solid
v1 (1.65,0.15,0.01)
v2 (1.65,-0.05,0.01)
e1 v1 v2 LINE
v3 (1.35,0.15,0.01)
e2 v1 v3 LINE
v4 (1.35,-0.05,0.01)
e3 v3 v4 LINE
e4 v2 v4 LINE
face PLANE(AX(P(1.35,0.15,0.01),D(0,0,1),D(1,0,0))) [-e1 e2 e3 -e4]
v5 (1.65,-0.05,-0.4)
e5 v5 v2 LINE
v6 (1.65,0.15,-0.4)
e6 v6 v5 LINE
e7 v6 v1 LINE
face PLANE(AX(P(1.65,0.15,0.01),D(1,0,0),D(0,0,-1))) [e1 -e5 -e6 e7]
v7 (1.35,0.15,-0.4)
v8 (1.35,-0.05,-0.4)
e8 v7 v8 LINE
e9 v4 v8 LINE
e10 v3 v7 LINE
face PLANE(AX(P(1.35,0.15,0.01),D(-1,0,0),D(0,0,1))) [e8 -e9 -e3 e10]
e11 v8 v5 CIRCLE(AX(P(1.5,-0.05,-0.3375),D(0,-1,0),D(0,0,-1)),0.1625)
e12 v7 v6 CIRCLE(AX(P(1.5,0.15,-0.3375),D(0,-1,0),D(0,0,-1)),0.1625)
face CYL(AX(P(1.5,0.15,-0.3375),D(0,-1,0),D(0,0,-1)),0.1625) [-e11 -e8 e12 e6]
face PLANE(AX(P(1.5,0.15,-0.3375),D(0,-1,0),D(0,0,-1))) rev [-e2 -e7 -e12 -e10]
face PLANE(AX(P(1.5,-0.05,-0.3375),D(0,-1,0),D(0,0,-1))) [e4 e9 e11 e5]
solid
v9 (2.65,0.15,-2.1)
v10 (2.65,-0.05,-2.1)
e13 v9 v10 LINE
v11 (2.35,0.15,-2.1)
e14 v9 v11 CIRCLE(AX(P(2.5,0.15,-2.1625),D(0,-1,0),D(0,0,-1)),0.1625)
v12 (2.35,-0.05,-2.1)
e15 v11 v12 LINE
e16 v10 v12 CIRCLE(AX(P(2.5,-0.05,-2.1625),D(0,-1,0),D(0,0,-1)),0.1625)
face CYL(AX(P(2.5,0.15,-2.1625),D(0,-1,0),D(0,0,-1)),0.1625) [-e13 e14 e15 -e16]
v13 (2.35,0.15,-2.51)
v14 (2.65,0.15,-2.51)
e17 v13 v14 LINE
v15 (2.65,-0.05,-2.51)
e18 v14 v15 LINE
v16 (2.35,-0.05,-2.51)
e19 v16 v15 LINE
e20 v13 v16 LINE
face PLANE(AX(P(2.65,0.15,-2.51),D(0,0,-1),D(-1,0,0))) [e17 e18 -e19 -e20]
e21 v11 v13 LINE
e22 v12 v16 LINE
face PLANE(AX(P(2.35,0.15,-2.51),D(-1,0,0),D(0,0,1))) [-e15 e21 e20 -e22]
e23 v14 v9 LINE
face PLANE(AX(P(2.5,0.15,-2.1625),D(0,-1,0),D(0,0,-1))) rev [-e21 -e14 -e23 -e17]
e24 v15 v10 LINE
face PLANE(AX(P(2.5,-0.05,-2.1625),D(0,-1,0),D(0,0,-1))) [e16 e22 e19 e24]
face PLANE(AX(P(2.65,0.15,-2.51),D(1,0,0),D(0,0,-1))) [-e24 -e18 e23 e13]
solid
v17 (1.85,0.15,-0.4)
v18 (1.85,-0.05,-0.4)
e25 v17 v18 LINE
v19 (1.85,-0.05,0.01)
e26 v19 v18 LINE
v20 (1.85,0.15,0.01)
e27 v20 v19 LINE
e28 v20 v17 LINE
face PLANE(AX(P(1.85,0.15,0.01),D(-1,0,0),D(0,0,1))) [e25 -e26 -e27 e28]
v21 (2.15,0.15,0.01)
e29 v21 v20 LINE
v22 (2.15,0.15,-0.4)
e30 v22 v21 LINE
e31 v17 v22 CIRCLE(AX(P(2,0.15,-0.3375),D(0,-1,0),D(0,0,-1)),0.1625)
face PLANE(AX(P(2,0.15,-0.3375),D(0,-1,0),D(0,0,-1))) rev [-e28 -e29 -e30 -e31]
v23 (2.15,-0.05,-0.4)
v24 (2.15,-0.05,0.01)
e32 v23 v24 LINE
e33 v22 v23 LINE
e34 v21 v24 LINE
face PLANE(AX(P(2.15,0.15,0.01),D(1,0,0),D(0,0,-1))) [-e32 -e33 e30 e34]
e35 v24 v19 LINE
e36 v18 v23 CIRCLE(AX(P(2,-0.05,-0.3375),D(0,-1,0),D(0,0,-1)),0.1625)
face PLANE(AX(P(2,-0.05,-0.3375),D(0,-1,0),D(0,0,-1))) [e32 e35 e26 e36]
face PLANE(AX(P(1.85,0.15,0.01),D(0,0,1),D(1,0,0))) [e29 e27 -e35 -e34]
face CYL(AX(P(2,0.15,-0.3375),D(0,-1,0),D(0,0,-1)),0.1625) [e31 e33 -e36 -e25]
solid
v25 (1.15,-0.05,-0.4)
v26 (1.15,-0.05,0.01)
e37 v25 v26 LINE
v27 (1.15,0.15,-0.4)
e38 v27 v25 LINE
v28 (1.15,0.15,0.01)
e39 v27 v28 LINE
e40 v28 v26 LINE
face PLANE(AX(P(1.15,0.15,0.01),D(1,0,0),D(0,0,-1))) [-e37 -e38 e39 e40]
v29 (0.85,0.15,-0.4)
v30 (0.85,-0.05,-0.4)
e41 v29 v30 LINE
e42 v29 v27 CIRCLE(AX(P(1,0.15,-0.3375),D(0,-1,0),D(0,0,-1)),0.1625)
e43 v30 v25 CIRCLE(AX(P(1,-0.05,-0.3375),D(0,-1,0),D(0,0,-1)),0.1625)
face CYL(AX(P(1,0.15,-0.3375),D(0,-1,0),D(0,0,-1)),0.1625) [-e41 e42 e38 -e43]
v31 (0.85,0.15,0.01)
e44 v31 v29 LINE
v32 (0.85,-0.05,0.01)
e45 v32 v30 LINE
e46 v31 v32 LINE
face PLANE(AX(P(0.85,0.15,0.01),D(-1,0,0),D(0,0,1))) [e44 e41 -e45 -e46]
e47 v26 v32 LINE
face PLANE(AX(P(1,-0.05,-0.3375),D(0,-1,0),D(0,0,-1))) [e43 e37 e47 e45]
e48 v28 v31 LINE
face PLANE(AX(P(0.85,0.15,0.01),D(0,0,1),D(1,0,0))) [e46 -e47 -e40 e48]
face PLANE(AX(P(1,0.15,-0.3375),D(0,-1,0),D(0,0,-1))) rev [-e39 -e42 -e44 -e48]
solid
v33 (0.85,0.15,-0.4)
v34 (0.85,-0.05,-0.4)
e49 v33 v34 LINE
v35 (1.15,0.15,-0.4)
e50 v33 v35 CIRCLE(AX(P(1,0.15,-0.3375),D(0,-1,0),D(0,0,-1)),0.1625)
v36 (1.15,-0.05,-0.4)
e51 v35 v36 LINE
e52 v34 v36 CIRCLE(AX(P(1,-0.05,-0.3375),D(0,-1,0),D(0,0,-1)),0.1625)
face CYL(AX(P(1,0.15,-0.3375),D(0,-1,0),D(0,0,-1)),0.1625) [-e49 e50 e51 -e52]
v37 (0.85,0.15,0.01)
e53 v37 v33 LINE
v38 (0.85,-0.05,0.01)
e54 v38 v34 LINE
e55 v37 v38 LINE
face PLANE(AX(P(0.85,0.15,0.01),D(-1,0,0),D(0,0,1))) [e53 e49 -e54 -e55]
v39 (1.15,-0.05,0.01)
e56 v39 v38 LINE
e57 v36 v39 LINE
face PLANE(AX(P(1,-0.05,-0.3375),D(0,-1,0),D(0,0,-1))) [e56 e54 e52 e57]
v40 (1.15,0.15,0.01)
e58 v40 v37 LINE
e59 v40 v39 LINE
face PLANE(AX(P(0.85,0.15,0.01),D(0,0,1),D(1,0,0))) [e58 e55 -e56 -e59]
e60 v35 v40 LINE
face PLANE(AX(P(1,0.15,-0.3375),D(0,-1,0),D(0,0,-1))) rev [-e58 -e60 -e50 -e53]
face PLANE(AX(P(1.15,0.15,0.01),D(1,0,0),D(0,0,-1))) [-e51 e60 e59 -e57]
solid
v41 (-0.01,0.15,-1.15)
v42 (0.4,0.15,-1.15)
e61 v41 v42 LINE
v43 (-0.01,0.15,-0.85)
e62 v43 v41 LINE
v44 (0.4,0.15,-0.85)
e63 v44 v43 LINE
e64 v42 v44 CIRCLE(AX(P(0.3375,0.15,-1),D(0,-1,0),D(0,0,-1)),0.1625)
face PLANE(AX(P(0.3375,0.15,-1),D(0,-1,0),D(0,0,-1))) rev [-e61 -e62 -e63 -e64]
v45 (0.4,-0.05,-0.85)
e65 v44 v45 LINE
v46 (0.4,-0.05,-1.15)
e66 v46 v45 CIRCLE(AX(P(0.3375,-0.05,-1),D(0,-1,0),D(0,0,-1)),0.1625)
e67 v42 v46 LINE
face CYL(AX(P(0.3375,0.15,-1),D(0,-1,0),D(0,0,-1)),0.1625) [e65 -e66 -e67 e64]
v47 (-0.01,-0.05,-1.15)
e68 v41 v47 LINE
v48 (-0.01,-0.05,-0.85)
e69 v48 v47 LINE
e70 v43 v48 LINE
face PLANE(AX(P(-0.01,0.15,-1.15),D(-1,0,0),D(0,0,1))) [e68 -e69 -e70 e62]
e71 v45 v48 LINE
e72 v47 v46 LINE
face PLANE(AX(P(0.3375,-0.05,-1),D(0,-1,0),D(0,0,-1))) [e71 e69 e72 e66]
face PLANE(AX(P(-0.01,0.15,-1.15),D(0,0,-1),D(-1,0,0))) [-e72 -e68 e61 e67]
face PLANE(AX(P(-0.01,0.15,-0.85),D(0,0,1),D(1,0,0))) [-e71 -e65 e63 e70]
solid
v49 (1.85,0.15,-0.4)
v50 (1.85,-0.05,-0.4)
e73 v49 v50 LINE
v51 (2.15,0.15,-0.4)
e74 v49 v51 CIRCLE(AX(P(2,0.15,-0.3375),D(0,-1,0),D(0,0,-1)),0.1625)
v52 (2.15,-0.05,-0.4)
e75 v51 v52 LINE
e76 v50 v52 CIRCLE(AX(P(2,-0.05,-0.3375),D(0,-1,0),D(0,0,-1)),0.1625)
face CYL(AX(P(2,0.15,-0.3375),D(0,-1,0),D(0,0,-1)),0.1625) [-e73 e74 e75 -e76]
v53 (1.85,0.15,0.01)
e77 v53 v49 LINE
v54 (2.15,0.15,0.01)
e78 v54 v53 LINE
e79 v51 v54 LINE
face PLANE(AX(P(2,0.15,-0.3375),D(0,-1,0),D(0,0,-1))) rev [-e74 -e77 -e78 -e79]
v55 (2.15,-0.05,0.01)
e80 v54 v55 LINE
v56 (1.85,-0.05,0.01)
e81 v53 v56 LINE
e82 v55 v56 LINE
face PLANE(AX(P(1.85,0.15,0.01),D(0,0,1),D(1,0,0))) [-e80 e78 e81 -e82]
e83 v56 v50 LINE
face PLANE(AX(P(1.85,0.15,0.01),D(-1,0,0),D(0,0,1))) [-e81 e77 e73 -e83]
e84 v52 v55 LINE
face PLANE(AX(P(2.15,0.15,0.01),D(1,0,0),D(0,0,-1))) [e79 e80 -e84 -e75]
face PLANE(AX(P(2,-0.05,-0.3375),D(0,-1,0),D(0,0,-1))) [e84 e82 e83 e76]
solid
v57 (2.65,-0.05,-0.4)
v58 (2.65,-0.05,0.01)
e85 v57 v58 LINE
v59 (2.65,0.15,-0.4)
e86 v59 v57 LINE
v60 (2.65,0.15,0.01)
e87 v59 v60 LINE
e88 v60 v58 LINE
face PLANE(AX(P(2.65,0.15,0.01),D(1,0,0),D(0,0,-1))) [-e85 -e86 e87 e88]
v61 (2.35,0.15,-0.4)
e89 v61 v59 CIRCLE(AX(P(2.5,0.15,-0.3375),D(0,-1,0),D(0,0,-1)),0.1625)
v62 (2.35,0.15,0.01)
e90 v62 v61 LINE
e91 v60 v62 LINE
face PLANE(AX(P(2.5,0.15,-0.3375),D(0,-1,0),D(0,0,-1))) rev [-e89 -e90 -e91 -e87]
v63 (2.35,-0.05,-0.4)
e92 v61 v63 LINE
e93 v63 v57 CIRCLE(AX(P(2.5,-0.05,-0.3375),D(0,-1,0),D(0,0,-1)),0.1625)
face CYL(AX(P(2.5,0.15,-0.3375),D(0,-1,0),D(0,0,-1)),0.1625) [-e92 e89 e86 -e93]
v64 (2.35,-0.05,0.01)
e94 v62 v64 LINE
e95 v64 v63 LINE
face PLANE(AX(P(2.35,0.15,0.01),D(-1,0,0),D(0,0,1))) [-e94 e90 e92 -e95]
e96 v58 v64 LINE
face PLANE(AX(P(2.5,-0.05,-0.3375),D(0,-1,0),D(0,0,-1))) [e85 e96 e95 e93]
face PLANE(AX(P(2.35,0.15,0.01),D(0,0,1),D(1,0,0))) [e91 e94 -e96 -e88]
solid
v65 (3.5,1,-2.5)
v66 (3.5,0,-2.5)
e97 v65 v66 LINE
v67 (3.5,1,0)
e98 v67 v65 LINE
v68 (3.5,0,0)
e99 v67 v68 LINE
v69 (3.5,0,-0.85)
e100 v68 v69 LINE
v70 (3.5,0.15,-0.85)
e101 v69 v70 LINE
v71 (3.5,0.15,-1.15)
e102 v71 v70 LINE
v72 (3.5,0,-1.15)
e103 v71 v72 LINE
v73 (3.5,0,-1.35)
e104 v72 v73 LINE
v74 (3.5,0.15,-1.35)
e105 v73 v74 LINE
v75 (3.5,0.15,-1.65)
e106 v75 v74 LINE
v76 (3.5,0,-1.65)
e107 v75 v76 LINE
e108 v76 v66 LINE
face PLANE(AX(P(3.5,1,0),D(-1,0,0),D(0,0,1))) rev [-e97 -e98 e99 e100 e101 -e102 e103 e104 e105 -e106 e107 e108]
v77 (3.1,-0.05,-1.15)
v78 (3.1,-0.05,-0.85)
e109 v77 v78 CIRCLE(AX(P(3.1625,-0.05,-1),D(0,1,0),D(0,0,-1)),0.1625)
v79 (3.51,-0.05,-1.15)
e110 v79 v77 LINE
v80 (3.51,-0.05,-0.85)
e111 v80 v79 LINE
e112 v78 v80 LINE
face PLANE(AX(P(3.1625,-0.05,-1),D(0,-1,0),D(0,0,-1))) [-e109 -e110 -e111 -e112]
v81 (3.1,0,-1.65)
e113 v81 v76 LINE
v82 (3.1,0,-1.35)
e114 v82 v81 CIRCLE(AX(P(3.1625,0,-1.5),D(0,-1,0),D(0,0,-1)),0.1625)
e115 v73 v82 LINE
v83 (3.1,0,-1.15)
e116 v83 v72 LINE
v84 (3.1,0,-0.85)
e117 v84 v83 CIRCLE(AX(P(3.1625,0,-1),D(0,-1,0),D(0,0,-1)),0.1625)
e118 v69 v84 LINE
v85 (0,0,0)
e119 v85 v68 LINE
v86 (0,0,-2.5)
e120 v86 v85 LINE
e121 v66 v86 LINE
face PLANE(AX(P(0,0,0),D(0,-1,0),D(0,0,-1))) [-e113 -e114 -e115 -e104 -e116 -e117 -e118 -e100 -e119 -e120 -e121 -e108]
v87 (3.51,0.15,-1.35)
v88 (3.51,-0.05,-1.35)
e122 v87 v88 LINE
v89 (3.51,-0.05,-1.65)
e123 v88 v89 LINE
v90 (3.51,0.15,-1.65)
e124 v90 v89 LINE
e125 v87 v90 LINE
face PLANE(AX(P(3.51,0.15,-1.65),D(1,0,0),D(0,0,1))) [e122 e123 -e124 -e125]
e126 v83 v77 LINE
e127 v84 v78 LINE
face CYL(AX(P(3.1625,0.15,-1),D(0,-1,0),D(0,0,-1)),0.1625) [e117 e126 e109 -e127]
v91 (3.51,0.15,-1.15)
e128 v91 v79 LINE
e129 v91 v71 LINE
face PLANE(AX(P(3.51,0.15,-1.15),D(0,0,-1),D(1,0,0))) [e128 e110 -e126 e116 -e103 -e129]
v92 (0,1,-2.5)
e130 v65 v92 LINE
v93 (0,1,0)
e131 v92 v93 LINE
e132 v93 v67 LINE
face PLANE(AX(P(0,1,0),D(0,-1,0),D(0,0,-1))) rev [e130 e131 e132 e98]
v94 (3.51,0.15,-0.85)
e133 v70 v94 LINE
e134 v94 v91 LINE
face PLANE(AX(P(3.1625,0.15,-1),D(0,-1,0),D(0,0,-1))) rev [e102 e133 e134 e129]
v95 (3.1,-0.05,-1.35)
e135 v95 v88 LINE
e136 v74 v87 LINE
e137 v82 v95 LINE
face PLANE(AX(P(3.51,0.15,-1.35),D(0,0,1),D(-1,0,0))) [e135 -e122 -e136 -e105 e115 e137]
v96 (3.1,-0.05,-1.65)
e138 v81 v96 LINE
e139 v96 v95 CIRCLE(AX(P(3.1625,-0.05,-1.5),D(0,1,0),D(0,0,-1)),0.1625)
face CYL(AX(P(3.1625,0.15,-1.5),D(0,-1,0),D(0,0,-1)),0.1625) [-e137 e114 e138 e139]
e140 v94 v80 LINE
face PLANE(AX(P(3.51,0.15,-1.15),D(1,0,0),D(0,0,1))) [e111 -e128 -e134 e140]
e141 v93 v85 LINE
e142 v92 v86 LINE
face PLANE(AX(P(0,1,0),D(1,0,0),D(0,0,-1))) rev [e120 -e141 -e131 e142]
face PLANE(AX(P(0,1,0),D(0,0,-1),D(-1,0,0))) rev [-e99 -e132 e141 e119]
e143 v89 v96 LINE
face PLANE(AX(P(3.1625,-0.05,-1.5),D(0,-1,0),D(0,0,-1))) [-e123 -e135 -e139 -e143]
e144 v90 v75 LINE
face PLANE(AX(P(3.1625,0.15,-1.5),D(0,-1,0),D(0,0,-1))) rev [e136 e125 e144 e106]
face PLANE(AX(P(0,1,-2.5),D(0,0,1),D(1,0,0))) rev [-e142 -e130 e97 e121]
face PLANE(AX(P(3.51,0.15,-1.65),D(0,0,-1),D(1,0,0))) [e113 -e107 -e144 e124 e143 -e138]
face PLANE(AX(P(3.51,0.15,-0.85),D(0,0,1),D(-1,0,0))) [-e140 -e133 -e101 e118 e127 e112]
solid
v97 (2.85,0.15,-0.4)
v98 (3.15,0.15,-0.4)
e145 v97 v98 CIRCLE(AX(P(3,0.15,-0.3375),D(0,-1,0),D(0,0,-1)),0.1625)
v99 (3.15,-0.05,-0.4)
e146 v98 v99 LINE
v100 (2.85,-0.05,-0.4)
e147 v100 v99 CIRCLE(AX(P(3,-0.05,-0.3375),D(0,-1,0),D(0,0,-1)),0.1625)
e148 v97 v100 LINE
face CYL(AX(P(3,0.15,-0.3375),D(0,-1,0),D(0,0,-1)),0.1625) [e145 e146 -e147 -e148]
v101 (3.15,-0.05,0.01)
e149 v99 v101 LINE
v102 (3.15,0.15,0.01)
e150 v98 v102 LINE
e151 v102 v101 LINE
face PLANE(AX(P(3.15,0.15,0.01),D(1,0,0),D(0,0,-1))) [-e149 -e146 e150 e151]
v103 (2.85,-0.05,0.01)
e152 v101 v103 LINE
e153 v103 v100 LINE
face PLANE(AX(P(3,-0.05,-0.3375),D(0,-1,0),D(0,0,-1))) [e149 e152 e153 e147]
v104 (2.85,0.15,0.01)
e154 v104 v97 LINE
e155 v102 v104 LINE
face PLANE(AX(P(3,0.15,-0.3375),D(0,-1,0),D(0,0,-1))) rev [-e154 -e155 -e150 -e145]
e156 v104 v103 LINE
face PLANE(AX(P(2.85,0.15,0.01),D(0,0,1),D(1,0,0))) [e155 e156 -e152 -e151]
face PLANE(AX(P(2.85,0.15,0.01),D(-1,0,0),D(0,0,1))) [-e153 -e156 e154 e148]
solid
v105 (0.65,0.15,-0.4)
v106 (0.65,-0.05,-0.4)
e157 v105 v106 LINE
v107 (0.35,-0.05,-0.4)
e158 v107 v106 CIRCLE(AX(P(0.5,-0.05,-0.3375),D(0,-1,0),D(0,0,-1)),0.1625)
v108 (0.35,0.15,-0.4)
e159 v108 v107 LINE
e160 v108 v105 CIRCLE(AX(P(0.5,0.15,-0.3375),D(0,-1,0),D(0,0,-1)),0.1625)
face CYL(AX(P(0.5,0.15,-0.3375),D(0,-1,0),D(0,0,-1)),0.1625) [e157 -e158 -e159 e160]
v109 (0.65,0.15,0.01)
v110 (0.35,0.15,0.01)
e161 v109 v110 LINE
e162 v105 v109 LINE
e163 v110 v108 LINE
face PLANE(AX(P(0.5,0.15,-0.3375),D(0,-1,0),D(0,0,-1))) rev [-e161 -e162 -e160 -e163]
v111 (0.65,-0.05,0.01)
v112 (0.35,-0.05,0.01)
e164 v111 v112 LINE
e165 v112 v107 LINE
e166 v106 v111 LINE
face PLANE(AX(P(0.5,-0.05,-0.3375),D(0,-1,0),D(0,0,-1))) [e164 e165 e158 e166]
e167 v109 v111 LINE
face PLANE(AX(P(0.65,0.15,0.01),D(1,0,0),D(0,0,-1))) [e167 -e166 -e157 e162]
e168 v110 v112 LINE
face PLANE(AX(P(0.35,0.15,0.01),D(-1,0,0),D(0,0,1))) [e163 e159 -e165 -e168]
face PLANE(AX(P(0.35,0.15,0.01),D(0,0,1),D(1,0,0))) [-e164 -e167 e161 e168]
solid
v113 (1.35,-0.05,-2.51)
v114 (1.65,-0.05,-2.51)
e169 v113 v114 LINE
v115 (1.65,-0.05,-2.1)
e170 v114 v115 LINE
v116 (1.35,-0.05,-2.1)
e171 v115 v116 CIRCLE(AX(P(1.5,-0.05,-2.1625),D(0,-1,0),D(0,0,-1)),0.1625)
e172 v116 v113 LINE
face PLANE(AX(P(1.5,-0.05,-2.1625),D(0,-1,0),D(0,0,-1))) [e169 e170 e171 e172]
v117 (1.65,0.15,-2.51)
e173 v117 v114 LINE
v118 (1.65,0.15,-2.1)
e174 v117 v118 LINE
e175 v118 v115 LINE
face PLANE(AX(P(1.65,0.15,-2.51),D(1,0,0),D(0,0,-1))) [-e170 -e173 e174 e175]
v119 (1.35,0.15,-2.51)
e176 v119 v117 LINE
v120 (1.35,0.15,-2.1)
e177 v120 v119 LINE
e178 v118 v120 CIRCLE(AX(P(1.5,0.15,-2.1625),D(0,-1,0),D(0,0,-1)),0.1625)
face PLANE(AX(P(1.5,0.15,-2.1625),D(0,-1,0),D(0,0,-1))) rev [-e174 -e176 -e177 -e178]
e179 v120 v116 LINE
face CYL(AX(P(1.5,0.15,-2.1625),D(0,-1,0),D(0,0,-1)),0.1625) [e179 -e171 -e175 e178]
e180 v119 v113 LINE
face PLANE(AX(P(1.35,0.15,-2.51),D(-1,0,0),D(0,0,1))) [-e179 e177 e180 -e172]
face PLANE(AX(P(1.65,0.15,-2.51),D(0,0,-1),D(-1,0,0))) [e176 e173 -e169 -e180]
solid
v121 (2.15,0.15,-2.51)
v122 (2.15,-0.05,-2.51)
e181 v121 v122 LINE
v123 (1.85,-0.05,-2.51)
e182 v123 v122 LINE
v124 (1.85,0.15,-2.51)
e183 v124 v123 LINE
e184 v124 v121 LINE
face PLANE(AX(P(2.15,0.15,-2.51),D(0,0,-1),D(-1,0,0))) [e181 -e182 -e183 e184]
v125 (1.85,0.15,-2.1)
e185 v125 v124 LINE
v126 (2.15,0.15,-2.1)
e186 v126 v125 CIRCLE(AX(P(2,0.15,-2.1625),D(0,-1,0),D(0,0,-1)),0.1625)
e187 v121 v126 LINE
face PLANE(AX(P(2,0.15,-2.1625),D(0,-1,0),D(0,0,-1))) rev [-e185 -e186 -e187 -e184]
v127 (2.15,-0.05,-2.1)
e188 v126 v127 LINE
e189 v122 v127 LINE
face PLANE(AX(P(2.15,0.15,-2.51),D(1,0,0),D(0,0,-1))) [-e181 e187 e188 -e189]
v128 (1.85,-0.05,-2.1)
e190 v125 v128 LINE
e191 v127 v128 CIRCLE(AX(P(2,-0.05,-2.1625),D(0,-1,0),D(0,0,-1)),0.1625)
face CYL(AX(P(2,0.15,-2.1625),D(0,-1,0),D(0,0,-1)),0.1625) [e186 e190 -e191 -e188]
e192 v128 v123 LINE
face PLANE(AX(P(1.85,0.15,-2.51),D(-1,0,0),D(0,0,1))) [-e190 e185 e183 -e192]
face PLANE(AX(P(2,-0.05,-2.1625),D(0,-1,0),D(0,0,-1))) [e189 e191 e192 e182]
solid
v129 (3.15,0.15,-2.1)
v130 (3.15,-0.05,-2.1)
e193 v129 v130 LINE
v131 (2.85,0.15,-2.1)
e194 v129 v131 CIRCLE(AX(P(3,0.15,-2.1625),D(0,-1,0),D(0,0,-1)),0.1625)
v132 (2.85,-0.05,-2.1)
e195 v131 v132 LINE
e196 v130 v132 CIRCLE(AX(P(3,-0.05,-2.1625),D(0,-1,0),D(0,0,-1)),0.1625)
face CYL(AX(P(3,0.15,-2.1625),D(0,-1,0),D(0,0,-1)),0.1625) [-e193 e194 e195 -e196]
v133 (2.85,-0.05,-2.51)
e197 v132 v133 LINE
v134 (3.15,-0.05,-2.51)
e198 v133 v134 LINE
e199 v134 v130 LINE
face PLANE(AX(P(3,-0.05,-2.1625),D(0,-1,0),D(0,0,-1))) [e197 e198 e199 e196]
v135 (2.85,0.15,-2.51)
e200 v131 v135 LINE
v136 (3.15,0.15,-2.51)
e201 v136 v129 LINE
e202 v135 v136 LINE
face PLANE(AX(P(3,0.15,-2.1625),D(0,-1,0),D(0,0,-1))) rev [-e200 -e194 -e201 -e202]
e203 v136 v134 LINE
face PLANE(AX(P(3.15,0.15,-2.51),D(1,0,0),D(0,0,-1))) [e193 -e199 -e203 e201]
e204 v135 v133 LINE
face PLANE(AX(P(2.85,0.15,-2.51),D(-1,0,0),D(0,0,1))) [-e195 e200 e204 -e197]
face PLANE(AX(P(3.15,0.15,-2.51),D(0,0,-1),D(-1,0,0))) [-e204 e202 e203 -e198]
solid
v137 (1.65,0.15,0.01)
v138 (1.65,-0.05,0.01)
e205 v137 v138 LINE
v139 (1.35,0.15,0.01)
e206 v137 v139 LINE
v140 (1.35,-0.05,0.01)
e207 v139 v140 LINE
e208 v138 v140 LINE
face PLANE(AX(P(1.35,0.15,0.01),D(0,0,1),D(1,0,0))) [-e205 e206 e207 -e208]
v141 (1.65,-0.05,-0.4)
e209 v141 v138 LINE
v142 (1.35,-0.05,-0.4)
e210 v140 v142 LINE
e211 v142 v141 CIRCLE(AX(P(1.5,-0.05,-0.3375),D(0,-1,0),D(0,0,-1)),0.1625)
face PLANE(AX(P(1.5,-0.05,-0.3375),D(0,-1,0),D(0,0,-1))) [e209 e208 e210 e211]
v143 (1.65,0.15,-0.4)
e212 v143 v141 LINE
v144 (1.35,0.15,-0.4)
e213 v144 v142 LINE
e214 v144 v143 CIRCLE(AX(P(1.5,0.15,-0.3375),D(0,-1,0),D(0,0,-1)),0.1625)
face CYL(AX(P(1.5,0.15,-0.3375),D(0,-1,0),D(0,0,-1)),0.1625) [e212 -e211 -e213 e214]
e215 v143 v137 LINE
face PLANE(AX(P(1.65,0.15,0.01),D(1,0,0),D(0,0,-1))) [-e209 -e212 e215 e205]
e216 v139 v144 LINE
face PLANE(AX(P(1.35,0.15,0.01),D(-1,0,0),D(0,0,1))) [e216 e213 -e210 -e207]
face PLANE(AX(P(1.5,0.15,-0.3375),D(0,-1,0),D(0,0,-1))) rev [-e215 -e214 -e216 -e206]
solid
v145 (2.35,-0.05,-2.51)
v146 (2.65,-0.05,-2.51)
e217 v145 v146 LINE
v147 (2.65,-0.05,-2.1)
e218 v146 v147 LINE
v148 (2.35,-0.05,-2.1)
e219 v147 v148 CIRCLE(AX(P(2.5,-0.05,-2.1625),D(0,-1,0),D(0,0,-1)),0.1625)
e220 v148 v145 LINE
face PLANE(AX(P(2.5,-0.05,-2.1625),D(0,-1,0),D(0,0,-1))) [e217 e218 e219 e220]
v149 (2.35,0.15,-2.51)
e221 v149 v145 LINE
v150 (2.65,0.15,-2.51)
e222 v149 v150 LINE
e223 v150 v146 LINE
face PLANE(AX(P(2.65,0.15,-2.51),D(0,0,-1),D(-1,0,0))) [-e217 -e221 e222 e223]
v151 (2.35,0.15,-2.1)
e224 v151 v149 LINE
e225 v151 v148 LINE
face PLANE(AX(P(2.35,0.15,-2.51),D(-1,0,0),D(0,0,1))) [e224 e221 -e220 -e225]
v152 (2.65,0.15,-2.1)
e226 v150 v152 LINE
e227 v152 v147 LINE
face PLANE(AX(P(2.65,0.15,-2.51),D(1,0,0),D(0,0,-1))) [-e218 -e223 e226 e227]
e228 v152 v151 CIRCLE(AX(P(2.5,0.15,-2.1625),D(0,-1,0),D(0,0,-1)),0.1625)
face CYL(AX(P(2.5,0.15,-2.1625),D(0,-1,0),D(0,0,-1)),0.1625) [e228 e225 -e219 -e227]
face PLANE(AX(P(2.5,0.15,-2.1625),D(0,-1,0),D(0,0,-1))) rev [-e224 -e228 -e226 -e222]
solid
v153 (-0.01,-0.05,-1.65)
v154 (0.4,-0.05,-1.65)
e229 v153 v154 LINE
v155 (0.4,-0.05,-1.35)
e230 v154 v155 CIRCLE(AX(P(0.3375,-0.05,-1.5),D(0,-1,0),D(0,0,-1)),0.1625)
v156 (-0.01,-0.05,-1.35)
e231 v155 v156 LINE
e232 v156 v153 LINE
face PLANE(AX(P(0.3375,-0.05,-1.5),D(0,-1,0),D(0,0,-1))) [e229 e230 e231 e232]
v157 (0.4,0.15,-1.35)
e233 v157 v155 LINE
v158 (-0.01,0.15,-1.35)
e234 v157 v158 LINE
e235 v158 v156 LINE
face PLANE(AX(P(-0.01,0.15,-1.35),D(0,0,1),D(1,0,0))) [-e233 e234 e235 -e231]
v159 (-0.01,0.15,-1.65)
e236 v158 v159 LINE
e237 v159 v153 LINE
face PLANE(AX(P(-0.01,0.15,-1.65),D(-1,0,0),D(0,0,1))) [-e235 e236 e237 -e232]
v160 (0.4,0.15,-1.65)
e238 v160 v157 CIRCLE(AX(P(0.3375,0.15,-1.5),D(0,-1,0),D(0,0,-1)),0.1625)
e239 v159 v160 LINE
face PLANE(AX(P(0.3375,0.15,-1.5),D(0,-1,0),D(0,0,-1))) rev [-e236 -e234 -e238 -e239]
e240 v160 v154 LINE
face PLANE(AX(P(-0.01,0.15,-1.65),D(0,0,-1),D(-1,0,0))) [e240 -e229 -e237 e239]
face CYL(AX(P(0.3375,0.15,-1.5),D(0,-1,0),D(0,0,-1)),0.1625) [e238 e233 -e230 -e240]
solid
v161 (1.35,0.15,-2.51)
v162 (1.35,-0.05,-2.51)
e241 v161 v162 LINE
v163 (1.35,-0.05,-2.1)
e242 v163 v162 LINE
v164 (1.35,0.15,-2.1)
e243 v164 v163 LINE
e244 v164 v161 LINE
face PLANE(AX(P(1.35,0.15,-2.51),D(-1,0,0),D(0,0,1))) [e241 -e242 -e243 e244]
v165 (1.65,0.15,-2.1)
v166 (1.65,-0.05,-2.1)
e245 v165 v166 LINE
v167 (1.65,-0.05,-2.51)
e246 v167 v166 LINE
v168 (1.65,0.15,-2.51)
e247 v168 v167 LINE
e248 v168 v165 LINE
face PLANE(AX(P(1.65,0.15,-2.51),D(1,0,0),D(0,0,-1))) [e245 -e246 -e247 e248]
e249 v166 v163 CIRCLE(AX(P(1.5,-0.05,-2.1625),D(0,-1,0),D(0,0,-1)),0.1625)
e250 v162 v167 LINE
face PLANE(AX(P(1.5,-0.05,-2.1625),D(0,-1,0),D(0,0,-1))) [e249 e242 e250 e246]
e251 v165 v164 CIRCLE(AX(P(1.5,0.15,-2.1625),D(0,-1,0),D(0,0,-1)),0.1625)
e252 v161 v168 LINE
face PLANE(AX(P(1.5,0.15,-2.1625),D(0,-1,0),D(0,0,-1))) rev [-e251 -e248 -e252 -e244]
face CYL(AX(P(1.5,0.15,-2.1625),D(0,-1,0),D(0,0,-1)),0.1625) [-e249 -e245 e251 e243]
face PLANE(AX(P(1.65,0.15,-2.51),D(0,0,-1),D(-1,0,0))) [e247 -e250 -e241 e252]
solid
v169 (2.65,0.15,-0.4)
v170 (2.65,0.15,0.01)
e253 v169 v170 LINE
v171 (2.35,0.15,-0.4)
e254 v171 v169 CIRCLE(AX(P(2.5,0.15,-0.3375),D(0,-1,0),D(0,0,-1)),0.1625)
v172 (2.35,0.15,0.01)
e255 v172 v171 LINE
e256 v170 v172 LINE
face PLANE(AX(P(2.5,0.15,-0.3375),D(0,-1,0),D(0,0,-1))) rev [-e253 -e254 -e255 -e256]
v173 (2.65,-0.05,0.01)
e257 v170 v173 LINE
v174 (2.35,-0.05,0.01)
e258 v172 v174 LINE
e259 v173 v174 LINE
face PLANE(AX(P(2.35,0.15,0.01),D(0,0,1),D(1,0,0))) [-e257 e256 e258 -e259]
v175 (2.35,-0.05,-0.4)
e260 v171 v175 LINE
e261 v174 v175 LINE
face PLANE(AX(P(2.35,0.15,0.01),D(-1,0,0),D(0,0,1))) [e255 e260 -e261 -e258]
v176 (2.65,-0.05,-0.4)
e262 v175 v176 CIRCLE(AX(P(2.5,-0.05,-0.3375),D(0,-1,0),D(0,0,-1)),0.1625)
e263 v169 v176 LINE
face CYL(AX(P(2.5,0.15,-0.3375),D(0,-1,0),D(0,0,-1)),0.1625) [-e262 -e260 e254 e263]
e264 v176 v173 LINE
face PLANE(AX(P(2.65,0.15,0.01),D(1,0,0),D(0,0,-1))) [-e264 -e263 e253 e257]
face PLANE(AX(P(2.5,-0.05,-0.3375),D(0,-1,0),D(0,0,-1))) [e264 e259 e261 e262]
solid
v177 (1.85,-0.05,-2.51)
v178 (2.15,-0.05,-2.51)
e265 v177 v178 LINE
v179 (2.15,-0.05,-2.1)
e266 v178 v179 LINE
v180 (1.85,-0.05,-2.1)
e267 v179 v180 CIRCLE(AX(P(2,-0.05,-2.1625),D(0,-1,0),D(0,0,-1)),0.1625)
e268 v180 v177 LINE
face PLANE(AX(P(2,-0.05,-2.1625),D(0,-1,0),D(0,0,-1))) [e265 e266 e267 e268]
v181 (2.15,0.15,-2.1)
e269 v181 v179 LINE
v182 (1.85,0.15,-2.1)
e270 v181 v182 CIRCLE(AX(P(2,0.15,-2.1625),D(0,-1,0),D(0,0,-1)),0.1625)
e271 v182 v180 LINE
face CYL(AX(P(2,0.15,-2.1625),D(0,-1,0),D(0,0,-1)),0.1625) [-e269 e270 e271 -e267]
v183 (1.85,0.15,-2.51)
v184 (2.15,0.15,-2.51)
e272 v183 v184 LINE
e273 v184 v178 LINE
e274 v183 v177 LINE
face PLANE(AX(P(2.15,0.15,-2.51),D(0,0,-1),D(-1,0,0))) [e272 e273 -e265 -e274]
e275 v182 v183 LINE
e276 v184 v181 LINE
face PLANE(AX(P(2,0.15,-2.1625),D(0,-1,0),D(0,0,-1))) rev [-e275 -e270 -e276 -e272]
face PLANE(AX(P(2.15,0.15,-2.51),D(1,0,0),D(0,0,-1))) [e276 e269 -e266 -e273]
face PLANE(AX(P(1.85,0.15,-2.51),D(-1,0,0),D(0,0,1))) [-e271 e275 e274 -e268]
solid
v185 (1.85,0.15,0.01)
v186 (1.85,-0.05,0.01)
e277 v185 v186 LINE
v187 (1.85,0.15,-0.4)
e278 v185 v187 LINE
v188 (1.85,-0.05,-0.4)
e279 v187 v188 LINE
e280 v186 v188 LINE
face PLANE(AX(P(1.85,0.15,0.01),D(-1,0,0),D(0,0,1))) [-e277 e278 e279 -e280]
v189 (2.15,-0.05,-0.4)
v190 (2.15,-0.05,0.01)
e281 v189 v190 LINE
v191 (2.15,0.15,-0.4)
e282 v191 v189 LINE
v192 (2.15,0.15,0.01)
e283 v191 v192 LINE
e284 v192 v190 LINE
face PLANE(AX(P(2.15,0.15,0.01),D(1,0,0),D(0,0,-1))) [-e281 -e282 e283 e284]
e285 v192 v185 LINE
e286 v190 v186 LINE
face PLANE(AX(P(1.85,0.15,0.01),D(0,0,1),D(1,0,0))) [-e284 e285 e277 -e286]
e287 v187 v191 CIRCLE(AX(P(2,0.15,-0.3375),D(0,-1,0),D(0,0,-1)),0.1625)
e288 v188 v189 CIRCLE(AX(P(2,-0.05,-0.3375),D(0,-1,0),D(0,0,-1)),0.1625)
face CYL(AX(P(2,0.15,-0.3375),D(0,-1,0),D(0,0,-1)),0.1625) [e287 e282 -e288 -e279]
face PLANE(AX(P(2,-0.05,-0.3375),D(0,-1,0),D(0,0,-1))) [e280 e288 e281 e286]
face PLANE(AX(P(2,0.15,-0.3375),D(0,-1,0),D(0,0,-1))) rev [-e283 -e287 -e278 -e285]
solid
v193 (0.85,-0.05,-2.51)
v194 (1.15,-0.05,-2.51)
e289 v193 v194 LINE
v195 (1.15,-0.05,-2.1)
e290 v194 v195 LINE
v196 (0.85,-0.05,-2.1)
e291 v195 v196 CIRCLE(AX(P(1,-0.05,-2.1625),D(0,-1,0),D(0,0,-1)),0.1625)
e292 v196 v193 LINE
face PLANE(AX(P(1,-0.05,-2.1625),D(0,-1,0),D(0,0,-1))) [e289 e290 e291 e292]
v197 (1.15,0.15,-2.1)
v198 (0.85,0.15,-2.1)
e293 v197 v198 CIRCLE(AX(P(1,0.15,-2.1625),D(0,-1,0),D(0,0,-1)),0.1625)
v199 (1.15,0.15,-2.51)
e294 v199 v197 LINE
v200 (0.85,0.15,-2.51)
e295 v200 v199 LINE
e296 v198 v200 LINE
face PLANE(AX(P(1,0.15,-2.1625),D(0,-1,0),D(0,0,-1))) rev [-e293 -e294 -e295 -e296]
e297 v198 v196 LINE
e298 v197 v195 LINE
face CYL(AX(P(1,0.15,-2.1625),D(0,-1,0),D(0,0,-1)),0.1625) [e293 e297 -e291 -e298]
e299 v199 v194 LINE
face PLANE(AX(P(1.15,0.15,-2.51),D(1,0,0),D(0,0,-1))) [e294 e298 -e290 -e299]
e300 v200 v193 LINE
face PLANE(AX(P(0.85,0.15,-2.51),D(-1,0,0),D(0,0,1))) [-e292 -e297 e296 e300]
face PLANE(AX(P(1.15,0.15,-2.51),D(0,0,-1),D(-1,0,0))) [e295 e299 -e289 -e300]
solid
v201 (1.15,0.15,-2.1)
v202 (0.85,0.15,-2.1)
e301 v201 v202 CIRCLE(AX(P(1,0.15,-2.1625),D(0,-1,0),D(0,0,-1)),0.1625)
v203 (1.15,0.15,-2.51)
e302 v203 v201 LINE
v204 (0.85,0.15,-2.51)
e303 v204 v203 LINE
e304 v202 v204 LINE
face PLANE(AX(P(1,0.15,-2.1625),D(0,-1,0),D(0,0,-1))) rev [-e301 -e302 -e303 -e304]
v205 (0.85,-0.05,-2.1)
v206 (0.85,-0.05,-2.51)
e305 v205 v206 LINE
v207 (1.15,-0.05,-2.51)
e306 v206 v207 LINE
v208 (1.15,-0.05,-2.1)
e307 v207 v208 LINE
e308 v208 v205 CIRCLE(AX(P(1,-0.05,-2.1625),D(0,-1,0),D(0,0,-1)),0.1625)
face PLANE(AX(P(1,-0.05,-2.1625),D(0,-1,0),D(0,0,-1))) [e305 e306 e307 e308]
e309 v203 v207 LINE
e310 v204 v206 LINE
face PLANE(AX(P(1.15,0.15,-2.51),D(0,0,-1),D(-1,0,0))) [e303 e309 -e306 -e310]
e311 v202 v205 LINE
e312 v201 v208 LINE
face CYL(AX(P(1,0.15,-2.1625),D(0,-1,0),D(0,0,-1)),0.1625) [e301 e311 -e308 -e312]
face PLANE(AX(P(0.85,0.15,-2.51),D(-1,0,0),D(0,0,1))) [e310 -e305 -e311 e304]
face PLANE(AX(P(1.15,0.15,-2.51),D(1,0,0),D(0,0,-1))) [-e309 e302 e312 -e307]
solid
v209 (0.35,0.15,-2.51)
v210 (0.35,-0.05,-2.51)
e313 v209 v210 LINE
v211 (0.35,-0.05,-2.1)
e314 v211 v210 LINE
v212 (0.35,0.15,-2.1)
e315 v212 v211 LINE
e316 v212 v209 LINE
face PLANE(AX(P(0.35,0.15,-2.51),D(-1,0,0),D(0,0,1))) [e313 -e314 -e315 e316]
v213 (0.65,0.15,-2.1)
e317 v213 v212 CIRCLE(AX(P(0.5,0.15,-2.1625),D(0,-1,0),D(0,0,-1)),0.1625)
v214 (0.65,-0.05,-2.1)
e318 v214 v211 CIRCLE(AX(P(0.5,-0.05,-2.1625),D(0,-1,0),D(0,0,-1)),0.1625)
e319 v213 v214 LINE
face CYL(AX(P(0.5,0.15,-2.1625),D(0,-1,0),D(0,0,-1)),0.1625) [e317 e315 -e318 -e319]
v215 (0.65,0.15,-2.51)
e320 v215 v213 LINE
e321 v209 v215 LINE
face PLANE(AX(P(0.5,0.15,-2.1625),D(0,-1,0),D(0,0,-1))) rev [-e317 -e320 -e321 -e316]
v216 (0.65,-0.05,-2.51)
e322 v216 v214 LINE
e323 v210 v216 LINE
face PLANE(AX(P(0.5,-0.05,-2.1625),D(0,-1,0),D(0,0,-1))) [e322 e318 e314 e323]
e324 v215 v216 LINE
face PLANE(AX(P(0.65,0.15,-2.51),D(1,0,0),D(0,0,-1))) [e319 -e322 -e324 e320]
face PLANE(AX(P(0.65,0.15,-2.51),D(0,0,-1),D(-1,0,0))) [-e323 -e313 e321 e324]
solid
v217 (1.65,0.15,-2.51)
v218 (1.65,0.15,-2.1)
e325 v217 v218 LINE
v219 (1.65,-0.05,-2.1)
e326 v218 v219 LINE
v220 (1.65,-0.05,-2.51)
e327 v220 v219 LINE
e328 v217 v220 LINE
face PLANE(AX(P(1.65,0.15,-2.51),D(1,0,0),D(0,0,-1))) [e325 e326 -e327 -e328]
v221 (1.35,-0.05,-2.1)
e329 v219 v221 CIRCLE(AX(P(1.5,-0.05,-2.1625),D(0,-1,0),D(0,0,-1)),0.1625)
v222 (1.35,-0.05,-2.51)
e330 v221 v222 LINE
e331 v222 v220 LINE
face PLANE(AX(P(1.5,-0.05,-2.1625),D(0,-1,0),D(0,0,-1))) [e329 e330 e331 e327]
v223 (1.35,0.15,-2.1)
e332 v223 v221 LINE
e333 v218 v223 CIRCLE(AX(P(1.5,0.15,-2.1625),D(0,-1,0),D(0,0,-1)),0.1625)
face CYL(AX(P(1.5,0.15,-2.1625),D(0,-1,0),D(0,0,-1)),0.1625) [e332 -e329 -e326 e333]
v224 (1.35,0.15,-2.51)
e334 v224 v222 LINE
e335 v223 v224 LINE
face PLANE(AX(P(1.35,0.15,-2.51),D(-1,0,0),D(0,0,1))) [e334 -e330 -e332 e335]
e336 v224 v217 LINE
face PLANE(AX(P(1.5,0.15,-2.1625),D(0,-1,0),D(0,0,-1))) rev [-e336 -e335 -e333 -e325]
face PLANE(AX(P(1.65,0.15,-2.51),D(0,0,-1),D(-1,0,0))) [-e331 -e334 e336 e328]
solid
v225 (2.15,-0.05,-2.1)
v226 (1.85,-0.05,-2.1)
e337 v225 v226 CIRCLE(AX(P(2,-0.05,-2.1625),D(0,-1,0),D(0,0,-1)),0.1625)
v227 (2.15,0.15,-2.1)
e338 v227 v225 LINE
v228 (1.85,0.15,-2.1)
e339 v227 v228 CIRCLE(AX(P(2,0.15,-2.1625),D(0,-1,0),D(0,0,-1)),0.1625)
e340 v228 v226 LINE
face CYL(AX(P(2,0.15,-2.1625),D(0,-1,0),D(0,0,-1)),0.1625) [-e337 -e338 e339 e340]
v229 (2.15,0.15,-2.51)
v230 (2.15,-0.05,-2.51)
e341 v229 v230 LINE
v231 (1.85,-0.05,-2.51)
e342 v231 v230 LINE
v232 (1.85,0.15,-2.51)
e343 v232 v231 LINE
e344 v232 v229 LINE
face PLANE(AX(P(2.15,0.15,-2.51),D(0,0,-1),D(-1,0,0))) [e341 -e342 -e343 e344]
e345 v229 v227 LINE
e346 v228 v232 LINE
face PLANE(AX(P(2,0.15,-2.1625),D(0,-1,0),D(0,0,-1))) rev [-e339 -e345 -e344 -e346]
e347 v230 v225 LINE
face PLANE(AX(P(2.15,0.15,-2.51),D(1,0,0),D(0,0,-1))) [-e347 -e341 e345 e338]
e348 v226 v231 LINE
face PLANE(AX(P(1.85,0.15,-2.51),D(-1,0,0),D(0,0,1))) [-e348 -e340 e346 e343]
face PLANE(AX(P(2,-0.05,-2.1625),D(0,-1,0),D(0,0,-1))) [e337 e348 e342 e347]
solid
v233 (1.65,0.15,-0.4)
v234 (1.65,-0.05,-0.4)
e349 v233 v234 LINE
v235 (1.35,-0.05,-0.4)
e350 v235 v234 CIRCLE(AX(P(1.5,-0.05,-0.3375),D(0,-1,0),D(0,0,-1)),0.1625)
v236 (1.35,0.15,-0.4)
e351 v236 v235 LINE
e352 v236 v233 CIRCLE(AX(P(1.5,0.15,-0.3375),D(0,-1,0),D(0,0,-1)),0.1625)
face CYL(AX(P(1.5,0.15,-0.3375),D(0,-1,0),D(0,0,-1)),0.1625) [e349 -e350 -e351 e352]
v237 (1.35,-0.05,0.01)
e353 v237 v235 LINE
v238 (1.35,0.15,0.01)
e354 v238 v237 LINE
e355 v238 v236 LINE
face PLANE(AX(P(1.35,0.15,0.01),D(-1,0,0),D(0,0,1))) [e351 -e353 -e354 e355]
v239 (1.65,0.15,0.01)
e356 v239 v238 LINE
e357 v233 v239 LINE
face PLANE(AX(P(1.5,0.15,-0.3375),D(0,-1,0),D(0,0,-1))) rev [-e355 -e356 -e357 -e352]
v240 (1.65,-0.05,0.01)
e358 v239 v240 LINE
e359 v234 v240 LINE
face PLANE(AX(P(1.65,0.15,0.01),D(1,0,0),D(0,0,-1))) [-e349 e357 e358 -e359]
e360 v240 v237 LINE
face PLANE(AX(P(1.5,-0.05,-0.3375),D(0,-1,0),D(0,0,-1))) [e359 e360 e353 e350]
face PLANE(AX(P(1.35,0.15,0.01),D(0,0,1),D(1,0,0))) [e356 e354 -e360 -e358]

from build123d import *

# Parameters (mm, degrees)
SKETCH1_W            = 3.5
SKETCH1_H            = 2.5
BOSS_EXTRUDE1_DEPTH  = 1
BOSS_EXTRUDE2_START  = 0.05
BOSS_EXTRUDE2_DEPTH  = 0.2
LPATTERN1_START      = -0.05
LPATTERN1_DEPTH      = 0.2
LPATTERN1_2_DEPTH    = 0.2
LPATTERN1_3_DEPTH    = 0.2
LPATTERN1_4_DEPTH    = 0.2
LPATTERN1_5_DEPTH    = 0.2
LPATTERN1_6_DEPTH    = 0.2
LPATTERN1_7_DEPTH    = 0.2
LPATTERN1_8_DEPTH    = 0.2
LPATTERN1_9_DEPTH    = 0.2
LPATTERN1_10_DEPTH   = 0.2
LPATTERN1_11_DEPTH   = 0.2
BOSS_EXTRUDE3_START  = 0.05
BOSS_EXTRUDE3_DEPTH  = 0.2
LPATTERN2_START      = -0.05
LPATTERN2_DEPTH      = 0.2
LPATTERN2_2_DEPTH    = 0.2
LPATTERN2_3_DEPTH    = 0.2
LPATTERN2_4_DEPTH    = 0.2
LPATTERN2_5_DEPTH    = 0.2
LPATTERN2_6_DEPTH    = 0.2
LPATTERN2_7_DEPTH    = 0.2
LPATTERN2_8_DEPTH    = 0.2
LPATTERN2_9_DEPTH    = 0.2
LPATTERN2_10_DEPTH   = 0.2
LPATTERN2_11_DEPTH   = 0.2
BOSS_EXTRUDE4_START  = 0.05
BOSS_EXTRUDE4_DEPTH  = 0.2
LPATTERN3_COUNT      = 2
LPATTERN3_PITCH      = 0.5
MIRROR7_START        = 0.05
MIRROR7_COPY_1_DEPTH = 0.2


# Read off the part's stored shape, not the designer's step: LPattern1, LPattern2
with BuildPart() as part:
    # Sketch1 → Boss-Extrude1 (new body)
    with BuildSketch(Plane(origin=(0, 0, 0), x_dir=(1, 0, 0), z_dir=(0, 1, 0))):
        with Locations((1.75, 1.25)):
            Rectangle(SKETCH1_W, SKETCH1_H)
    extrude(amount=BOSS_EXTRUDE1_DEPTH)


with BuildPart() as body_2:
    # Sketch2 → Boss-Extrude2 (new body)
    with BuildSketch(Plane.XZ.offset(BOSS_EXTRUDE2_START)):
        with BuildLine():
            Line((2.15, 0.01), (2.15, -0.4))
            ThreePointArc((2.15, -0.4), (2, -0.5), (1.85, -0.4))
            Line((1.85, -0.4), (1.85, 0.01))
            Line((1.85, 0.01), (2.15, 0.01))
        make_face()
    extrude(amount=-BOSS_EXTRUDE2_DEPTH)


with BuildPart() as body_3:
    # LPattern1 outline → LPattern1 (new body)
    with BuildSketch(Plane(origin=(0, 0, 0), x_dir=(1, 0, 0), z_dir=(0, 1, 0)).offset(LPATTERN1_START)):
        with BuildLine():
            ThreePointArc((1.65, 0.4), (1.5, 0.5), (1.35, 0.4))
            Line((1.35, 0.4), (1.35, -0.01))
            Line((1.35, -0.01), (1.65, -0.01))
            Line((1.65, -0.01), (1.65, 0.4))
        make_face()
    extrude(amount=LPATTERN1_DEPTH)


with BuildPart() as body_4:
    # LPattern1 2 outline → LPattern1 2 (new body)
    with BuildSketch(Plane(origin=(0, 0, 0), x_dir=(1, 0, 0), z_dir=(0, 1, 0)).offset(LPATTERN1_START)):
        with BuildLine():
            ThreePointArc((2.65, 0.4), (2.5, 0.5), (2.35, 0.4))
            Line((2.35, 0.4), (2.35, -0.01))
            Line((2.35, -0.01), (2.65, -0.01))
            Line((2.65, -0.01), (2.65, 0.4))
        make_face()
    extrude(amount=LPATTERN1_2_DEPTH)


with BuildPart() as body_5:
    # LPattern1 3 outline → LPattern1 3 (new body)
    with BuildSketch(Plane(origin=(0, 0, 0), x_dir=(1, 0, 0), z_dir=(0, 1, 0)).offset(LPATTERN1_START)):
        with BuildLine():
            ThreePointArc((3.15, 0.4), (3, 0.5), (2.85, 0.4))
            Line((2.85, 0.4), (2.85, -0.01))
            Line((2.85, -0.01), (3.15, -0.01))
            Line((3.15, -0.01), (3.15, 0.4))
        make_face()
    extrude(amount=LPATTERN1_3_DEPTH)


with BuildPart() as body_6:
    # LPattern1 4 outline → LPattern1 4 (new body)
    with BuildSketch(Plane(origin=(0, 0, 0), x_dir=(1, 0, 0), z_dir=(0, 1, 0)).offset(LPATTERN1_START)):
        with BuildLine():
            ThreePointArc((1.15, 0.4), (1, 0.5), (0.85, 0.4))
            Line((0.85, 0.4), (0.85, -0.01))
            Line((0.85, -0.01), (1.15, -0.01))
            Line((1.15, -0.01), (1.15, 0.4))
        make_face()
    extrude(amount=LPATTERN1_4_DEPTH)


with BuildPart() as body_7:
    # LPattern1 5 outline → LPattern1 5 (new body)
    with BuildSketch(Plane(origin=(0, 0, 0), x_dir=(1, 0, 0), z_dir=(0, 1, 0)).offset(LPATTERN1_START)):
        with BuildLine():
            ThreePointArc((1.65, 0.4), (1.5, 0.5), (1.35, 0.4))
            Line((1.35, 0.4), (1.35, -0.01))
            Line((1.35, -0.01), (1.65, -0.01))
            Line((1.65, -0.01), (1.65, 0.4))
        make_face()
    extrude(amount=LPATTERN1_5_DEPTH)


with BuildPart() as body_8:
    # LPattern1 6 outline → LPattern1 6 (new body)
    with BuildSketch(Plane(origin=(0, 0, 0), x_dir=(1, 0, 0), z_dir=(0, 1, 0)).offset(LPATTERN1_START)):
        with BuildLine():
            ThreePointArc((2.15, 0.4), (2, 0.5), (1.85, 0.4))
            Line((1.85, 0.4), (1.85, -0.01))
            Line((1.85, -0.01), (2.15, -0.01))
            Line((2.15, -0.01), (2.15, 0.4))
        make_face()
    extrude(amount=LPATTERN1_6_DEPTH)


with BuildPart() as body_9:
    # LPattern1 7 outline → LPattern1 7 (new body)
    with BuildSketch(Plane(origin=(0, 0, 0), x_dir=(1, 0, 0), z_dir=(0, 1, 0)).offset(LPATTERN1_START)):
        with BuildLine():
            ThreePointArc((2.65, 0.4), (2.5, 0.5), (2.35, 0.4))
            Line((2.35, 0.4), (2.35, -0.01))
            Line((2.35, -0.01), (2.65, -0.01))
            Line((2.65, -0.01), (2.65, 0.4))
        make_face()
    extrude(amount=LPATTERN1_7_DEPTH)


with BuildPart() as body_10:
    # LPattern1 8 outline → LPattern1 8 (new body)
    with BuildSketch(Plane(origin=(0, 0, 0), x_dir=(1, 0, 0), z_dir=(0, 1, 0)).offset(LPATTERN1_START)):
        with BuildLine():
            ThreePointArc((0.65, 0.4), (0.5, 0.5), (0.35, 0.4))
            Line((0.35, 0.4), (0.35, -0.01))
            Line((0.35, -0.01), (0.65, -0.01))
            Line((0.65, -0.01), (0.65, 0.4))
        make_face()
    extrude(amount=LPATTERN1_8_DEPTH)


with BuildPart() as body_11:
    # LPattern1 9 outline → LPattern1 9 (new body)
    with BuildSketch(Plane(origin=(0, 0, 0), x_dir=(1, 0, 0), z_dir=(0, 1, 0)).offset(LPATTERN1_START)):
        with BuildLine():
            ThreePointArc((1.15, 0.4), (1, 0.5), (0.85, 0.4))
            Line((0.85, 0.4), (0.85, -0.01))
            Line((0.85, -0.01), (1.15, -0.01))
            Line((1.15, -0.01), (1.15, 0.4))
        make_face()
    extrude(amount=LPATTERN1_9_DEPTH)


with BuildPart() as body_12:
    # LPattern1 10 outline → LPattern1 10 (new body)
    with BuildSketch(Plane(origin=(0, 0, 0), x_dir=(1, 0, 0), z_dir=(0, 1, 0)).offset(LPATTERN1_START)):
        with BuildLine():
            ThreePointArc((1.65, 0.4), (1.5, 0.5), (1.35, 0.4))
            Line((1.35, 0.4), (1.35, -0.01))
            Line((1.35, -0.01), (1.65, -0.01))
            Line((1.65, -0.01), (1.65, 0.4))
        make_face()
    extrude(amount=LPATTERN1_10_DEPTH)


with BuildPart() as body_13:
    # LPattern1 11 outline → LPattern1 11 (new body)
    with BuildSketch(Plane(origin=(0, 0, 0), x_dir=(1, 0, 0), z_dir=(0, 1, 0)).offset(LPATTERN1_START)):
        with BuildLine():
            ThreePointArc((2.15, 0.4), (2, 0.5), (1.85, 0.4))
            Line((1.85, 0.4), (1.85, -0.01))
            Line((1.85, -0.01), (2.15, -0.01))
            Line((2.15, -0.01), (2.15, 0.4))
        make_face()
    extrude(amount=LPATTERN1_11_DEPTH)


with BuildPart() as body_14:
    # Sketch4 → Boss-Extrude3 (new body)
    with BuildSketch(Plane.XZ.offset(BOSS_EXTRUDE3_START)):
        with BuildLine():
            Line((1.35, -2.51), (1.35, -2.1))
            ThreePointArc((1.35, -2.1), (1.5, -2), (1.65, -2.1))
            Line((1.65, -2.1), (1.65, -2.51))
            Line((1.65, -2.51), (1.35, -2.51))
        make_face()
    extrude(amount=-BOSS_EXTRUDE3_DEPTH)


with BuildPart() as body_15:
    # LPattern2 outline → LPattern2 (new body)
    with BuildSketch(Plane(origin=(0, 0, 0), x_dir=(1, 0, 0), z_dir=(0, 1, 0)).offset(LPATTERN2_START)):
        with BuildLine():
            ThreePointArc((1.85, 2.1), (2, 2), (2.15, 2.1))
            Line((2.15, 2.1), (2.15, 2.51))
            Line((2.15, 2.51), (1.85, 2.51))
            Line((1.85, 2.51), (1.85, 2.1))
        make_face()
    extrude(amount=LPATTERN2_DEPTH)


with BuildPart() as body_16:
    # LPattern2 2 outline → LPattern2 2 (new body)
    with BuildSketch(Plane(origin=(0, 0, 0), x_dir=(1, 0, 0), z_dir=(0, 1, 0)).offset(LPATTERN2_START)):
        with BuildLine():
            ThreePointArc((0.85, 2.1), (1, 2), (1.15, 2.1))
            Line((1.15, 2.1), (1.15, 2.51))
            Line((1.15, 2.51), (0.85, 2.51))
            Line((0.85, 2.51), (0.85, 2.1))
        make_face()
    extrude(amount=LPATTERN2_2_DEPTH)


with BuildPart() as body_17:
    # LPattern2 3 outline → LPattern2 3 (new body)
    with BuildSketch(Plane(origin=(0, 0, 0), x_dir=(1, 0, 0), z_dir=(0, 1, 0)).offset(LPATTERN2_START)):
        with BuildLine():
            ThreePointArc((0.35, 2.1), (0.5, 2), (0.65, 2.1))
            Line((0.65, 2.1), (0.65, 2.51))
            Line((0.65, 2.51), (0.35, 2.51))
            Line((0.35, 2.51), (0.35, 2.1))
        make_face()
    extrude(amount=LPATTERN2_3_DEPTH)


with BuildPart() as body_18:
    # LPattern2 4 outline → LPattern2 4 (new body)
    with BuildSketch(Plane(origin=(0, 0, 0), x_dir=(1, 0, 0), z_dir=(0, 1, 0)).offset(LPATTERN2_START)):
        with BuildLine():
            ThreePointArc((2.35, 2.1), (2.5, 2), (2.65, 2.1))
            Line((2.65, 2.1), (2.65, 2.51))
            Line((2.65, 2.51), (2.35, 2.51))
            Line((2.35, 2.51), (2.35, 2.1))
        make_face()
    extrude(amount=LPATTERN2_4_DEPTH)


with BuildPart() as body_19:
    # LPattern2 5 outline → LPattern2 5 (new body)
    with BuildSketch(Plane(origin=(0, 0, 0), x_dir=(1, 0, 0), z_dir=(0, 1, 0)).offset(LPATTERN2_START)):
        with BuildLine():
            ThreePointArc((1.85, 2.1), (2, 2), (2.15, 2.1))
            Line((2.15, 2.1), (2.15, 2.51))
            Line((2.15, 2.51), (1.85, 2.51))
            Line((1.85, 2.51), (1.85, 2.1))
        make_face()
    extrude(amount=LPATTERN2_5_DEPTH)


with BuildPart() as body_20:
    # LPattern2 6 outline → LPattern2 6 (new body)
    with BuildSketch(Plane(origin=(0, 0, 0), x_dir=(1, 0, 0), z_dir=(0, 1, 0)).offset(LPATTERN2_START)):
        with BuildLine():
            ThreePointArc((1.35, 2.1), (1.5, 2), (1.65, 2.1))
            Line((1.65, 2.1), (1.65, 2.51))
            Line((1.65, 2.51), (1.35, 2.51))
            Line((1.35, 2.51), (1.35, 2.1))
        make_face()
    extrude(amount=LPATTERN2_6_DEPTH)


with BuildPart() as body_21:
    # LPattern2 7 outline → LPattern2 7 (new body)
    with BuildSketch(Plane(origin=(0, 0, 0), x_dir=(1, 0, 0), z_dir=(0, 1, 0)).offset(LPATTERN2_START)):
        with BuildLine():
            ThreePointArc((0.85, 2.1), (1, 2), (1.15, 2.1))
            Line((1.15, 2.1), (1.15, 2.51))
            Line((1.15, 2.51), (0.85, 2.51))
            Line((0.85, 2.51), (0.85, 2.1))
        make_face()
    extrude(amount=LPATTERN2_7_DEPTH)


with BuildPart() as body_22:
    # LPattern2 8 outline → LPattern2 8 (new body)
    with BuildSketch(Plane(origin=(0, 0, 0), x_dir=(1, 0, 0), z_dir=(0, 1, 0)).offset(LPATTERN2_START)):
        with BuildLine():
            ThreePointArc((2.85, 2.1), (3, 2), (3.15, 2.1))
            Line((3.15, 2.1), (3.15, 2.51))
            Line((3.15, 2.51), (2.85, 2.51))
            Line((2.85, 2.51), (2.85, 2.1))
        make_face()
    extrude(amount=LPATTERN2_8_DEPTH)


with BuildPart() as body_23:
    # LPattern2 9 outline → LPattern2 9 (new body)
    with BuildSketch(Plane(origin=(0, 0, 0), x_dir=(1, 0, 0), z_dir=(0, 1, 0)).offset(LPATTERN2_START)):
        with BuildLine():
            ThreePointArc((2.35, 2.1), (2.5, 2), (2.65, 2.1))
            Line((2.65, 2.1), (2.65, 2.51))
            Line((2.65, 2.51), (2.35, 2.51))
            Line((2.35, 2.51), (2.35, 2.1))
        make_face()
    extrude(amount=LPATTERN2_9_DEPTH)


with BuildPart() as body_24:
    # LPattern2 10 outline → LPattern2 10 (new body)
    with BuildSketch(Plane(origin=(0, 0, 0), x_dir=(1, 0, 0), z_dir=(0, 1, 0)).offset(LPATTERN2_START)):
        with BuildLine():
            ThreePointArc((1.85, 2.1), (2, 2), (2.15, 2.1))
            Line((2.15, 2.1), (2.15, 2.51))
            Line((2.15, 2.51), (1.85, 2.51))
            Line((1.85, 2.51), (1.85, 2.1))
        make_face()
    extrude(amount=LPATTERN2_10_DEPTH)


with BuildPart() as body_25:
    # LPattern2 11 outline → LPattern2 11 (new body)
    with BuildSketch(Plane(origin=(0, 0, 0), x_dir=(1, 0, 0), z_dir=(0, 1, 0)).offset(LPATTERN2_START)):
        with BuildLine():
            ThreePointArc((1.35, 2.1), (1.5, 2), (1.65, 2.1))
            Line((1.65, 2.1), (1.65, 2.51))
            Line((1.65, 2.51), (1.35, 2.51))
            Line((1.35, 2.51), (1.35, 2.1))
        make_face()
    extrude(amount=LPATTERN2_11_DEPTH)


with BuildPart() as body_26:
    # Sketch5 → Boss-Extrude4 (new body)
    with BuildSketch(Plane.XZ.offset(BOSS_EXTRUDE4_START)):
        with BuildLine():
            Line((-0.01, -0.85), (0.4, -0.85))
            ThreePointArc((0.4, -0.85), (0.5, -1), (0.4, -1.15))
            Line((0.4, -1.15), (-0.01, -1.15))
            Line((-0.01, -1.15), (-0.01, -0.85))
        make_face()
    boss_extrude4 = extrude(amount=-BOSS_EXTRUDE4_DEPTH)


with BuildPart() as lpattern3_1:
    # LPattern3: Boss-Extrude4 ×2
    with Locations(*[(0, 0, -i * LPATTERN3_PITCH) for i in range(1, LPATTERN3_COUNT)]):
        add(boss_extrude4)


with BuildPart() as part_1:
    add(part.part)

    # Mirror7: Boss-Extrude4 across plane
    add(boss_extrude4.mirror(Plane(origin=(1.75, 0, 0), x_dir=(0, 0, 1), z_dir=(1, 0, 0))))

    # Mirror7 copy 1 sketch → Mirror7 copy 1 (add)
    with BuildSketch(Plane(origin=(3.5, 0, -0.5), x_dir=(-1, 0, 0), z_dir=(0, -1, 0)).offset(MIRROR7_START)):
        with BuildLine():
            Line((-0.01, 0.85), (0.4, 0.85))
            ThreePointArc((0.4, 0.85), (0.5, 1), (0.4, 1.15))
            Line((0.4, 1.15), (-0.01, 1.15))
            Line((-0.01, 1.15), (-0.01, 0.85))
        make_face()
    extrude(amount=-MIRROR7_COPY_1_DEPTH)


solid = Compound([body_2.part, body_3.part, body_4.part, body_5.part, body_6.part, body_7.part, body_8.part, body_9.part, body_10.part, body_11.part, body_12.part, body_13.part, body_14.part, body_15.part, body_16.part, body_17.part, body_18.part, body_19.part, body_20.part, body_21.part, body_22.part, body_23.part, body_24.part, body_25.part, body_26.part, lpattern3_1.part, part_1.part])
